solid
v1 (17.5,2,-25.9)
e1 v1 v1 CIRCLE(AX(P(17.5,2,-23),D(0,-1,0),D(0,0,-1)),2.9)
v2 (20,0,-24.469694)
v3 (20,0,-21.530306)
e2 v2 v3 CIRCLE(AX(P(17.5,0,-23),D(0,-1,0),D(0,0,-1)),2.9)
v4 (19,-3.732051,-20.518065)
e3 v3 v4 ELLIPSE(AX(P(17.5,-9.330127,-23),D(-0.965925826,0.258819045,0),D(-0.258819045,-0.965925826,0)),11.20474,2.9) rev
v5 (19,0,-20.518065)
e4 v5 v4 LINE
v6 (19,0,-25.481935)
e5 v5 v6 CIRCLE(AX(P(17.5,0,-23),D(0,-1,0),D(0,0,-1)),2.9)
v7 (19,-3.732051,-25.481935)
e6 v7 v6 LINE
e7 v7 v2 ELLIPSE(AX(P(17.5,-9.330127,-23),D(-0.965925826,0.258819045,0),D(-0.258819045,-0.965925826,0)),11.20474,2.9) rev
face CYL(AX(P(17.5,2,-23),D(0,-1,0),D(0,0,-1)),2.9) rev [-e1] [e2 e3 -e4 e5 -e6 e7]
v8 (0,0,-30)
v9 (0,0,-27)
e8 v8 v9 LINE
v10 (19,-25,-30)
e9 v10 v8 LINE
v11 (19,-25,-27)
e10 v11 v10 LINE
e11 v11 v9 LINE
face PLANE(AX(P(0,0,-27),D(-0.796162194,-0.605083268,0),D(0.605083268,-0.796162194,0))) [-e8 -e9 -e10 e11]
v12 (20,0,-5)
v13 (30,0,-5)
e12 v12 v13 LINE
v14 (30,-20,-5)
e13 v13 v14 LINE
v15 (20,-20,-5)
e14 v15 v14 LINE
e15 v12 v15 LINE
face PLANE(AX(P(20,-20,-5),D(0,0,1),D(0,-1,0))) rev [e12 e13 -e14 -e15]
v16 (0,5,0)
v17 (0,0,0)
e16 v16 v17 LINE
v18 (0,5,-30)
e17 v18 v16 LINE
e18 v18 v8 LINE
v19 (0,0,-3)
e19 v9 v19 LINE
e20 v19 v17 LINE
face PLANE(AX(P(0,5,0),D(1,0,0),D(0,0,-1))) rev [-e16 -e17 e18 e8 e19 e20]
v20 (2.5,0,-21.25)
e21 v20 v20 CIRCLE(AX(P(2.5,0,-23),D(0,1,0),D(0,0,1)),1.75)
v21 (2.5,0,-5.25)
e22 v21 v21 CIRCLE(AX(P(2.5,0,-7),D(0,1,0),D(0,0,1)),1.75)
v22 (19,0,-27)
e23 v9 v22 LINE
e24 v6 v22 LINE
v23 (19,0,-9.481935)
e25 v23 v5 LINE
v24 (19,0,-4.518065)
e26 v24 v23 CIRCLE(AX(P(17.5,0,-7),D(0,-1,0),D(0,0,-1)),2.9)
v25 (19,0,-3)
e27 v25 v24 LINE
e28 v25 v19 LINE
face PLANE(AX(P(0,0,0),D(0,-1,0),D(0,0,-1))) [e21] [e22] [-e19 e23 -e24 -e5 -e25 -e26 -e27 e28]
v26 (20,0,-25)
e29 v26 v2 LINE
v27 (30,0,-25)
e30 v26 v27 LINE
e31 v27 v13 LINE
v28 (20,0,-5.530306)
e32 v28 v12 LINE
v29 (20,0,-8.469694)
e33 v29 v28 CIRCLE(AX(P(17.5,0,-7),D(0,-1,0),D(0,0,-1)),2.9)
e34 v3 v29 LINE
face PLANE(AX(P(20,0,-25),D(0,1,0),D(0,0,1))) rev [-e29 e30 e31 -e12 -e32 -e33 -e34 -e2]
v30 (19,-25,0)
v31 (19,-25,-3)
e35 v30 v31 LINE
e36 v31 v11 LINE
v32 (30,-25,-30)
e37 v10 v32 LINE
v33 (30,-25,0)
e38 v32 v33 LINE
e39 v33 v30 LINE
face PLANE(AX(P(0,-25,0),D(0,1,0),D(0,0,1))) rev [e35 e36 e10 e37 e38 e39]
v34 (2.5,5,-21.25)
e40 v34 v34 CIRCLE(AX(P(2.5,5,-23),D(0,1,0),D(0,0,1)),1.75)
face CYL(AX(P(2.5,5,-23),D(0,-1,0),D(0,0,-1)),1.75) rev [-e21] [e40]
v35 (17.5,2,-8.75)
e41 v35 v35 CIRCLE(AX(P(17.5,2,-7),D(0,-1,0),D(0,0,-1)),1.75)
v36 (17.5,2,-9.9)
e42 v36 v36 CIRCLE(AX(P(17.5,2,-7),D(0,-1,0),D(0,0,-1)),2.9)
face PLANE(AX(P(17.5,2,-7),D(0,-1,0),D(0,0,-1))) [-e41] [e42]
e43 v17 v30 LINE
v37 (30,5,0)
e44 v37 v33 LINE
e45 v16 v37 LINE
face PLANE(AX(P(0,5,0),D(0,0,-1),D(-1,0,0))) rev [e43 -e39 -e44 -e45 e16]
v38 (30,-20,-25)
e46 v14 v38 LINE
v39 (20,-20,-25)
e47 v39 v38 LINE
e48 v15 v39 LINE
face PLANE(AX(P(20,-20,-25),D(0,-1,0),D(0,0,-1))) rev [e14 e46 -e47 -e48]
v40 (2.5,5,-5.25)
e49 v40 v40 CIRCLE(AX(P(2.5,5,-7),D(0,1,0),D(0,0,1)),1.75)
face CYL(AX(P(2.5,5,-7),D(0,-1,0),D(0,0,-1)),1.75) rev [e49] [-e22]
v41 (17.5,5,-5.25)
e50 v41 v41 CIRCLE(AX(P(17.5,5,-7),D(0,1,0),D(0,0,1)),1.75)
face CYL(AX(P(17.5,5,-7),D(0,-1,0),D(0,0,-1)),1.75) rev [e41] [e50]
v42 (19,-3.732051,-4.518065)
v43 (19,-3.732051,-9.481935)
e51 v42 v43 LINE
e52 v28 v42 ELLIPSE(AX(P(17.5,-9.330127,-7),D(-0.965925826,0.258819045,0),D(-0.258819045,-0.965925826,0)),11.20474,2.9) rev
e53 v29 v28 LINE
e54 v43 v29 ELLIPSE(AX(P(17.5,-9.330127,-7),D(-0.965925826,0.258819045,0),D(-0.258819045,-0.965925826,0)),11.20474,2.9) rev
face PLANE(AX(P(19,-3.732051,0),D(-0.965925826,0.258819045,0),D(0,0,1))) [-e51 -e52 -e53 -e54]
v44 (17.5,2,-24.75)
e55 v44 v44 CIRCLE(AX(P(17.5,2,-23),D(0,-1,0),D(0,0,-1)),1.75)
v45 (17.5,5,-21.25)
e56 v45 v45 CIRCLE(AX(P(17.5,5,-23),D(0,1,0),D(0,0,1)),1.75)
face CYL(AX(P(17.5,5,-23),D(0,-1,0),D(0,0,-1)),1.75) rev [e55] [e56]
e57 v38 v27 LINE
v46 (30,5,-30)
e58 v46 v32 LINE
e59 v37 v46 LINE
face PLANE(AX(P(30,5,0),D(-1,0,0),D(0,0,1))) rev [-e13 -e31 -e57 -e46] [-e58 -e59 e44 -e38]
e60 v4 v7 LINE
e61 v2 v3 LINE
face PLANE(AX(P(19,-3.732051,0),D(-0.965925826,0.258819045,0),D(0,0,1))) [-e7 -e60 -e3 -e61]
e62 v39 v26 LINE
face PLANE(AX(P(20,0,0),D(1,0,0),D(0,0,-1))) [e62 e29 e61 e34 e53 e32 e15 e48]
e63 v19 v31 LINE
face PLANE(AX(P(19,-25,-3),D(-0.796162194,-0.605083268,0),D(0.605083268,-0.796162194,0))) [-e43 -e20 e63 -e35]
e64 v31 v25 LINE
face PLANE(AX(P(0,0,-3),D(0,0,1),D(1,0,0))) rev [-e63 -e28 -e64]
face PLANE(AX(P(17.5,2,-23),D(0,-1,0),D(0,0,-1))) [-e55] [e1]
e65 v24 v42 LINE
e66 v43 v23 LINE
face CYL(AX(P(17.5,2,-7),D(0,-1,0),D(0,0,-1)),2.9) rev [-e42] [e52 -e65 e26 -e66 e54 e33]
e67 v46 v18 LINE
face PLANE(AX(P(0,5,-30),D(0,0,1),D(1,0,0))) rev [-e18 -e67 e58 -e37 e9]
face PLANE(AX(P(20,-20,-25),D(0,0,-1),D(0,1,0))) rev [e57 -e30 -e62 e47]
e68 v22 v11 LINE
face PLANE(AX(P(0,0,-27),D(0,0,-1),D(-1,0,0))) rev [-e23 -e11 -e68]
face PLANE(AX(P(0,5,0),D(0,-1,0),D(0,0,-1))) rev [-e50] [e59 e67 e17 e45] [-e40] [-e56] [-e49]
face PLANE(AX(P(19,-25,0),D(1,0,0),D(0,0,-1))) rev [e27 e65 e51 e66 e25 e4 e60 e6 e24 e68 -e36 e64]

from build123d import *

# Parameters (mm, degrees)
SKETCH1_W           = 30
SKETCH1_H           = 30
SKETCH1_R           = 1.75
BOSS_EXTRUDE1_DEPTH = 5
SKETCH2_W           = 11
SKETCH2_H           = 30
BOSS_EXTRUDE2_DEPTH = 25
SKETCH3_W           = 20
SKETCH3_H           = 20
CUT_EXTRUDE1_DEPTH  = 10
BOSS_EXTRUDE3_DEPTH = 3
BOSS_EXTRUDE4_DEPTH = 3
SKETCH12_R          = 2.9
CUT_EXTRUDE3_DEPTH  = 2
CHAMFER3_SIZE       = 3.732050808
CHAMFER3_SIZE_2     = 1


with BuildPart() as part:
    # Sketch1 → Boss-Extrude1 (new body)
    with BuildSketch(Plane(origin=(0, 0, 0), x_dir=(1, 0, 0), z_dir=(0, 1, 0))):
        with Locations((15, 15)):
            Rectangle(SKETCH1_W, SKETCH1_H)
        with Locations(Location((2.5, 7, 0), (0, 0, 270))):
            Circle(SKETCH1_R, mode=Mode.SUBTRACT)
        with Locations(Location((17.5, 7, 0), (0, 0, 270))):
            Circle(SKETCH1_R, mode=Mode.SUBTRACT)
        with Locations(Location((2.5, 23, 0), (0, 0, 270))):
            Circle(SKETCH1_R, mode=Mode.SUBTRACT)
        with Locations(Location((17.5, 23, 0), (0, 0, 270))):
            Circle(SKETCH1_R, mode=Mode.SUBTRACT)
    extrude(amount=BOSS_EXTRUDE1_DEPTH)

    # Sketch2 → Boss-Extrude2 (add)
    with BuildSketch(Plane.XZ):
        with Locations((24.5, -15)):
            Rectangle(SKETCH2_W, SKETCH2_H)
    extrude(amount=BOSS_EXTRUDE2_DEPTH)

    # Sketch3 → Cut-Extrude1 (cut)
    with BuildSketch(Plane(origin=(30, 0, 0), x_dir=(0, 0, -1), z_dir=(1, 0, 0))):
        with Locations((15, -10)):
            Rectangle(SKETCH3_W, SKETCH3_H)
    extrude(amount=-CUT_EXTRUDE1_DEPTH, mode=Mode.SUBTRACT)

    # Sketch8 → Boss-Extrude3 (add)
    with BuildSketch(Plane(origin=(0, 0, -30), x_dir=(-1, 0, 0), z_dir=(0, 0, -1))):
        Polygon((-19, 0), (0, 0), (-19, -25), align=None)
    extrude(amount=-BOSS_EXTRUDE3_DEPTH)

    # Sketch11 → Boss-Extrude4 (add)
    with BuildSketch(Plane.XY):
        Polygon((19, -25), (0, 0), (19, 0), align=None)
    extrude(amount=-BOSS_EXTRUDE4_DEPTH)

    # Sketch12 → Cut-Extrude3 (cut)
    with BuildSketch(Plane.XZ):
        with Locations(Location((17.5, -23, 0), (0, 0, 270))):
            Circle(SKETCH12_R)
        with Locations(Location((17.5, -7, 0), (0, 0, 270))):
            Circle(SKETCH12_R)
    extrude(amount=-CUT_EXTRUDE3_DEPTH, mode=Mode.SUBTRACT)

    # Chamfer3
    # the kernel refuses this chamfer: 3.732050808, 1 mm, written as the material it takes off along each edge
    with BuildSketch(Plane(origin=(19, 0, -10.826968438), x_dir=(-0.009967146577155864, -0.9999503267608394, 0), z_dir=(0, 0, -1))) as chamfer3_piece_1_section:
        Polygon((CHAMFER3_SIZE * 0.999950326645, -CHAMFER3_SIZE * 0.009967146576), (-CHAMFER3_SIZE_2 * 0.00996714657716, -CHAMFER3_SIZE_2 * 0.999950326761), (0, 0), align=None)
    chamfer3_piece_1 = extrude(amount=24.346063125, mode=Mode.PRIVATE)
    chamfer3_piece_1 = chamfer3_piece_1 & Plane(origin=(17.5, -1.271193321, -23), x_dir=(0, 0, -1), z_dir=(0, -1, 0)) * Cylinder(2.9, 64, mode=Mode.PRIVATE)
    add(chamfer3_piece_1, mode=Mode.SUBTRACT)
    with BuildSketch(Plane(origin=(19, 0, 5.173031562), x_dir=(-0.009967146577155864, -0.9999503267608394, 0), z_dir=(0, 0, -1))) as chamfer3_piece_2_section:
        Polygon((CHAMFER3_SIZE * 0.999950326645, -CHAMFER3_SIZE * 0.009967146576), (-CHAMFER3_SIZE_2 * 0.00996714657716, -CHAMFER3_SIZE_2 * 0.999950326761), (0, 0), align=None)
    chamfer3_piece_2 = extrude(amount=24.346063125, mode=Mode.PRIVATE)
    chamfer3_piece_2 = chamfer3_piece_2 & Plane(origin=(17.5, -1.525075197, -7), x_dir=(0, 0, -1), z_dir=(0, -1, 0)) * Cylinder(2.9, 64, mode=Mode.PRIVATE)
    add(chamfer3_piece_2, mode=Mode.SUBTRACT)


solid = part.part
